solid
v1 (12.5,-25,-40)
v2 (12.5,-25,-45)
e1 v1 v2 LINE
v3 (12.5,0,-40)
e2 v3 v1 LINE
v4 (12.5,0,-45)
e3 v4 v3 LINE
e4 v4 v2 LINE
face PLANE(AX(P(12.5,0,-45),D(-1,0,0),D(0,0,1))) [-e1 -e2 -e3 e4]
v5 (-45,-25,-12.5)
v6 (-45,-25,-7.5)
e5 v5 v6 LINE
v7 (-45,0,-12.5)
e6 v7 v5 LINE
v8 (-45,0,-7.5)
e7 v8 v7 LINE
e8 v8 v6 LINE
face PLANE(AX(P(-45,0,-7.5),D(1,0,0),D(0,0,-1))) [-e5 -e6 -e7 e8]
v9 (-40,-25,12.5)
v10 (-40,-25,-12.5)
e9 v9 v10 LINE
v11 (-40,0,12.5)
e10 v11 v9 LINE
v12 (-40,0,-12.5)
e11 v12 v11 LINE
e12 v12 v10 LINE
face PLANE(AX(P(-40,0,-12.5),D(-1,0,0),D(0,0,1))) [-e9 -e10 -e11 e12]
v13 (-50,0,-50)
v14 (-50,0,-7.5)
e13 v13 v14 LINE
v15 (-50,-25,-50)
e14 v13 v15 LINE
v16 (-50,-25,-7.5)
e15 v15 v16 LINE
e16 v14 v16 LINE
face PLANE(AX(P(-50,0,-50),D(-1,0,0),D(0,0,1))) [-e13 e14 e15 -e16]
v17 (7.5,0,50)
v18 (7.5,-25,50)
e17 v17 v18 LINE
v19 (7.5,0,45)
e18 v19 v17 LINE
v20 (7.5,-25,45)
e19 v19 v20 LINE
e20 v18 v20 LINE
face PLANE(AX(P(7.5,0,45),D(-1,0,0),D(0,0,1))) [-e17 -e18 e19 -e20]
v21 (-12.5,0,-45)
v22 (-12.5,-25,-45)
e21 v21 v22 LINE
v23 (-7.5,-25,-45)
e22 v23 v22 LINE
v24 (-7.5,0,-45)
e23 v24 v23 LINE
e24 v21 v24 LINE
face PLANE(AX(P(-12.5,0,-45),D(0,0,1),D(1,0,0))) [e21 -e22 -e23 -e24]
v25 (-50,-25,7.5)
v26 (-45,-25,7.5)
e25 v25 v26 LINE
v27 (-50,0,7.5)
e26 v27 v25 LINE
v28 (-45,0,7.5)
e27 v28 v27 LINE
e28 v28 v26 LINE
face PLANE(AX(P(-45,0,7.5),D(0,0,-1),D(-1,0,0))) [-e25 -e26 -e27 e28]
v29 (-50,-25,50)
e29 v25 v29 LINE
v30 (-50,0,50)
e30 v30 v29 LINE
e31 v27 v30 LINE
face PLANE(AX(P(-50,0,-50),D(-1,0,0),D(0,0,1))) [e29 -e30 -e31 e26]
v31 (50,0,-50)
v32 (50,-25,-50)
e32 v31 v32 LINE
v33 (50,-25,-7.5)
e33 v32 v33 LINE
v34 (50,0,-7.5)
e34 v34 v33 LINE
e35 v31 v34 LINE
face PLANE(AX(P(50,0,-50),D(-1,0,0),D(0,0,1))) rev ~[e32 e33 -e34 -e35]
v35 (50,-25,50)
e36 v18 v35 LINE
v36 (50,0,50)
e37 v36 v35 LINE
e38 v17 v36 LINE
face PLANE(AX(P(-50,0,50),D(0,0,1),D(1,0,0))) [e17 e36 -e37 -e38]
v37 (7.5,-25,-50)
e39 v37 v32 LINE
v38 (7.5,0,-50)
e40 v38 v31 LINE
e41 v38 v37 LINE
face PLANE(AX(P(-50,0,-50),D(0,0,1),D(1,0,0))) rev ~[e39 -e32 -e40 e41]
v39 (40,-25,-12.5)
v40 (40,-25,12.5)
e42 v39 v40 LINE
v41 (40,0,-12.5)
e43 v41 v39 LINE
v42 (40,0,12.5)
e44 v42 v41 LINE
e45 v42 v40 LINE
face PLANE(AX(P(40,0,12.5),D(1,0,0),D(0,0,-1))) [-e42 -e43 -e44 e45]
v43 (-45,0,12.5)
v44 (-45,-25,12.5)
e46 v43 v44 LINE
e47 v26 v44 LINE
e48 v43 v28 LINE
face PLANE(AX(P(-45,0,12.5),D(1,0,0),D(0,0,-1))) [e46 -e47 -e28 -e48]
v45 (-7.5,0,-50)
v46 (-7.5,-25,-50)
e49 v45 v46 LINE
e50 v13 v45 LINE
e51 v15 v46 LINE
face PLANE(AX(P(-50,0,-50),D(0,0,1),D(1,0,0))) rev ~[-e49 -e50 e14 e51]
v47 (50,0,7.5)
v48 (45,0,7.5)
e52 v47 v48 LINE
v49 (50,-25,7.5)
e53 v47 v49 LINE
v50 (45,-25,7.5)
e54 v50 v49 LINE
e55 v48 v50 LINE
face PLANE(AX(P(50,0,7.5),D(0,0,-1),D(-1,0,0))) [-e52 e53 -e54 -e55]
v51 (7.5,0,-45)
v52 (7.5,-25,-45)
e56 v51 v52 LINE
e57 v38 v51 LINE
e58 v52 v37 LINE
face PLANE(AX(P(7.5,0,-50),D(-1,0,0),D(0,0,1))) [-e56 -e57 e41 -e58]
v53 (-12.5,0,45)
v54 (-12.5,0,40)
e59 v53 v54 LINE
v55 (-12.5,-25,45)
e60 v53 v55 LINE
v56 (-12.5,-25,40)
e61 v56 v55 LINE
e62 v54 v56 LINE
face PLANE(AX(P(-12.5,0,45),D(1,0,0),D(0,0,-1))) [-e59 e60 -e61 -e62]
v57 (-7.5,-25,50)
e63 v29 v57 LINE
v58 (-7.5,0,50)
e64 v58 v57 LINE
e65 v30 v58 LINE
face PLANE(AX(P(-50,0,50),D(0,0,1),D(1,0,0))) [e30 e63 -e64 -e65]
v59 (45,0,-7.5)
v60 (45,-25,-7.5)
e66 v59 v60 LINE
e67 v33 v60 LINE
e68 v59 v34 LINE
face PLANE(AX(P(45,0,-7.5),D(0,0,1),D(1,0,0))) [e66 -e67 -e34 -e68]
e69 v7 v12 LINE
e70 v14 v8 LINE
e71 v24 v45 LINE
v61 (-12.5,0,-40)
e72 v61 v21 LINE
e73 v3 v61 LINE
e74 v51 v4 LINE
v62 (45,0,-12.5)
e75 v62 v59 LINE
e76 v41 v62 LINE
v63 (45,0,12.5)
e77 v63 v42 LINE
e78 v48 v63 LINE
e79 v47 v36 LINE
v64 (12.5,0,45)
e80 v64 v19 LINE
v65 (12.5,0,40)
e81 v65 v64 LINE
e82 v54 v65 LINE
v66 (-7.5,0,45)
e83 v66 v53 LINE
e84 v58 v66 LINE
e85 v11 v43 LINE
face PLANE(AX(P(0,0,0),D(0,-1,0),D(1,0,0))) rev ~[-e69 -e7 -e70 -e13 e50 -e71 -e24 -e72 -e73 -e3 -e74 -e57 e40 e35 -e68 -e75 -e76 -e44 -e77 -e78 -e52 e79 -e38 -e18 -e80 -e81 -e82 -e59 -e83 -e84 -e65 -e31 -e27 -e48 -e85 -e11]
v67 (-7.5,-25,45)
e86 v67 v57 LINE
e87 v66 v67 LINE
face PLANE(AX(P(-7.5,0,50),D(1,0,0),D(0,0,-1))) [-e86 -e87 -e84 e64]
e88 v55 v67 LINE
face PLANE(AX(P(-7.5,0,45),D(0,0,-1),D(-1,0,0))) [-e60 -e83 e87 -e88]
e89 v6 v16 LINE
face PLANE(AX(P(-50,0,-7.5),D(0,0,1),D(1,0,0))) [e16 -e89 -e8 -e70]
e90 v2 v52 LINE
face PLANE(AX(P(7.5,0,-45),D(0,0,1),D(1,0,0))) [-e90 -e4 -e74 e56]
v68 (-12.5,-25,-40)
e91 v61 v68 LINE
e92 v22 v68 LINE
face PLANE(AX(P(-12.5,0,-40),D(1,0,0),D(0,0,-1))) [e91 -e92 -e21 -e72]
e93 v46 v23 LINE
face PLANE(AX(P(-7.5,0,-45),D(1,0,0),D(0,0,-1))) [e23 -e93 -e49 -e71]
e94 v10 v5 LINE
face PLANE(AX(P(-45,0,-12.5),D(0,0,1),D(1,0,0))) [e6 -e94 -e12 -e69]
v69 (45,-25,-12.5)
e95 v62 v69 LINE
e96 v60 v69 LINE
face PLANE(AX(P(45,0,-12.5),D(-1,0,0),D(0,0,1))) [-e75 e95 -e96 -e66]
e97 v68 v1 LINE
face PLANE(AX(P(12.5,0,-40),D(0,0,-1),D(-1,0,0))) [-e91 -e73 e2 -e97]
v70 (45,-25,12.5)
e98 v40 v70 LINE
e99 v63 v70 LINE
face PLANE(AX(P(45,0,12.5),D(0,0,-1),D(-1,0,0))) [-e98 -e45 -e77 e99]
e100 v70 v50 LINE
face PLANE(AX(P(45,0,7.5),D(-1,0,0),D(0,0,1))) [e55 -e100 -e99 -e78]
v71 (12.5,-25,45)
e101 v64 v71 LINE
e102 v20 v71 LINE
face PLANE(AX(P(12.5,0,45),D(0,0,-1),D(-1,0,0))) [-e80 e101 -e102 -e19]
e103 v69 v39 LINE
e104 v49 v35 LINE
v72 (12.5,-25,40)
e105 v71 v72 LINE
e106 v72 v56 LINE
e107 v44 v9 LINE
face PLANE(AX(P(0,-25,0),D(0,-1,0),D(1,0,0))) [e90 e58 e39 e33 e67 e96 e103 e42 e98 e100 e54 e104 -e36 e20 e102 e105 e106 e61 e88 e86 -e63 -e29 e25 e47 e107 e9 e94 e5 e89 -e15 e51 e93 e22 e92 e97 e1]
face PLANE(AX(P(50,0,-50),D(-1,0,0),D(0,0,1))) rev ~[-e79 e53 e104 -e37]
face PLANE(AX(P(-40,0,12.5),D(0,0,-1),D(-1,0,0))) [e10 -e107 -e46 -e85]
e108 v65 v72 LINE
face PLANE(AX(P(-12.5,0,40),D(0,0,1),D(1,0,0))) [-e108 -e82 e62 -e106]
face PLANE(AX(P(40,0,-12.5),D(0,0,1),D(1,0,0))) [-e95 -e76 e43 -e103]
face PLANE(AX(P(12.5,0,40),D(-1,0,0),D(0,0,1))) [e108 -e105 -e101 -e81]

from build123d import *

# Parameters (mm, degrees)
F0_W            = 100
F0_H            = 100
F2_DEPTH        = 25
F4_DEPTH        = 25.001
F4_COPIES_COUNT = 4


# Not quite as in the source:
# - a pattern or mirror of a feature is missing from the dataset's text; its kind, count and spacing are read off the source's solid


with BuildPart() as f2:
    # F0 (on Front) → F2 (new body)
    with BuildSketch(Plane.XZ):
        Rectangle(F0_W, F0_H)
    extrude(amount=F2_DEPTH)

    # F3 (on Front) → F4 (cut, through all)
    with BuildSketch(Plane.XZ):
        Polygon((7.5, 50), (0, 50), (-7.5, 50), (-7.5, 45), (-12.5, 45), (-12.5, 40), (0, 40), (12.5, 40), (12.5, 45), (7.5, 45), align=None)
    f4 = extrude(amount=F4_DEPTH, mode=Mode.SUBTRACT)

    # F4_copies: F4 ×4 about axis
    f4_copies_axis = Axis((0, 0, 0), (0, 1, 0))
    for i in range(1, F4_COPIES_COUNT):
        add(f4.rotate(f4_copies_axis, i * 360 / F4_COPIES_COUNT), mode=Mode.SUBTRACT)


solid = f2.part
